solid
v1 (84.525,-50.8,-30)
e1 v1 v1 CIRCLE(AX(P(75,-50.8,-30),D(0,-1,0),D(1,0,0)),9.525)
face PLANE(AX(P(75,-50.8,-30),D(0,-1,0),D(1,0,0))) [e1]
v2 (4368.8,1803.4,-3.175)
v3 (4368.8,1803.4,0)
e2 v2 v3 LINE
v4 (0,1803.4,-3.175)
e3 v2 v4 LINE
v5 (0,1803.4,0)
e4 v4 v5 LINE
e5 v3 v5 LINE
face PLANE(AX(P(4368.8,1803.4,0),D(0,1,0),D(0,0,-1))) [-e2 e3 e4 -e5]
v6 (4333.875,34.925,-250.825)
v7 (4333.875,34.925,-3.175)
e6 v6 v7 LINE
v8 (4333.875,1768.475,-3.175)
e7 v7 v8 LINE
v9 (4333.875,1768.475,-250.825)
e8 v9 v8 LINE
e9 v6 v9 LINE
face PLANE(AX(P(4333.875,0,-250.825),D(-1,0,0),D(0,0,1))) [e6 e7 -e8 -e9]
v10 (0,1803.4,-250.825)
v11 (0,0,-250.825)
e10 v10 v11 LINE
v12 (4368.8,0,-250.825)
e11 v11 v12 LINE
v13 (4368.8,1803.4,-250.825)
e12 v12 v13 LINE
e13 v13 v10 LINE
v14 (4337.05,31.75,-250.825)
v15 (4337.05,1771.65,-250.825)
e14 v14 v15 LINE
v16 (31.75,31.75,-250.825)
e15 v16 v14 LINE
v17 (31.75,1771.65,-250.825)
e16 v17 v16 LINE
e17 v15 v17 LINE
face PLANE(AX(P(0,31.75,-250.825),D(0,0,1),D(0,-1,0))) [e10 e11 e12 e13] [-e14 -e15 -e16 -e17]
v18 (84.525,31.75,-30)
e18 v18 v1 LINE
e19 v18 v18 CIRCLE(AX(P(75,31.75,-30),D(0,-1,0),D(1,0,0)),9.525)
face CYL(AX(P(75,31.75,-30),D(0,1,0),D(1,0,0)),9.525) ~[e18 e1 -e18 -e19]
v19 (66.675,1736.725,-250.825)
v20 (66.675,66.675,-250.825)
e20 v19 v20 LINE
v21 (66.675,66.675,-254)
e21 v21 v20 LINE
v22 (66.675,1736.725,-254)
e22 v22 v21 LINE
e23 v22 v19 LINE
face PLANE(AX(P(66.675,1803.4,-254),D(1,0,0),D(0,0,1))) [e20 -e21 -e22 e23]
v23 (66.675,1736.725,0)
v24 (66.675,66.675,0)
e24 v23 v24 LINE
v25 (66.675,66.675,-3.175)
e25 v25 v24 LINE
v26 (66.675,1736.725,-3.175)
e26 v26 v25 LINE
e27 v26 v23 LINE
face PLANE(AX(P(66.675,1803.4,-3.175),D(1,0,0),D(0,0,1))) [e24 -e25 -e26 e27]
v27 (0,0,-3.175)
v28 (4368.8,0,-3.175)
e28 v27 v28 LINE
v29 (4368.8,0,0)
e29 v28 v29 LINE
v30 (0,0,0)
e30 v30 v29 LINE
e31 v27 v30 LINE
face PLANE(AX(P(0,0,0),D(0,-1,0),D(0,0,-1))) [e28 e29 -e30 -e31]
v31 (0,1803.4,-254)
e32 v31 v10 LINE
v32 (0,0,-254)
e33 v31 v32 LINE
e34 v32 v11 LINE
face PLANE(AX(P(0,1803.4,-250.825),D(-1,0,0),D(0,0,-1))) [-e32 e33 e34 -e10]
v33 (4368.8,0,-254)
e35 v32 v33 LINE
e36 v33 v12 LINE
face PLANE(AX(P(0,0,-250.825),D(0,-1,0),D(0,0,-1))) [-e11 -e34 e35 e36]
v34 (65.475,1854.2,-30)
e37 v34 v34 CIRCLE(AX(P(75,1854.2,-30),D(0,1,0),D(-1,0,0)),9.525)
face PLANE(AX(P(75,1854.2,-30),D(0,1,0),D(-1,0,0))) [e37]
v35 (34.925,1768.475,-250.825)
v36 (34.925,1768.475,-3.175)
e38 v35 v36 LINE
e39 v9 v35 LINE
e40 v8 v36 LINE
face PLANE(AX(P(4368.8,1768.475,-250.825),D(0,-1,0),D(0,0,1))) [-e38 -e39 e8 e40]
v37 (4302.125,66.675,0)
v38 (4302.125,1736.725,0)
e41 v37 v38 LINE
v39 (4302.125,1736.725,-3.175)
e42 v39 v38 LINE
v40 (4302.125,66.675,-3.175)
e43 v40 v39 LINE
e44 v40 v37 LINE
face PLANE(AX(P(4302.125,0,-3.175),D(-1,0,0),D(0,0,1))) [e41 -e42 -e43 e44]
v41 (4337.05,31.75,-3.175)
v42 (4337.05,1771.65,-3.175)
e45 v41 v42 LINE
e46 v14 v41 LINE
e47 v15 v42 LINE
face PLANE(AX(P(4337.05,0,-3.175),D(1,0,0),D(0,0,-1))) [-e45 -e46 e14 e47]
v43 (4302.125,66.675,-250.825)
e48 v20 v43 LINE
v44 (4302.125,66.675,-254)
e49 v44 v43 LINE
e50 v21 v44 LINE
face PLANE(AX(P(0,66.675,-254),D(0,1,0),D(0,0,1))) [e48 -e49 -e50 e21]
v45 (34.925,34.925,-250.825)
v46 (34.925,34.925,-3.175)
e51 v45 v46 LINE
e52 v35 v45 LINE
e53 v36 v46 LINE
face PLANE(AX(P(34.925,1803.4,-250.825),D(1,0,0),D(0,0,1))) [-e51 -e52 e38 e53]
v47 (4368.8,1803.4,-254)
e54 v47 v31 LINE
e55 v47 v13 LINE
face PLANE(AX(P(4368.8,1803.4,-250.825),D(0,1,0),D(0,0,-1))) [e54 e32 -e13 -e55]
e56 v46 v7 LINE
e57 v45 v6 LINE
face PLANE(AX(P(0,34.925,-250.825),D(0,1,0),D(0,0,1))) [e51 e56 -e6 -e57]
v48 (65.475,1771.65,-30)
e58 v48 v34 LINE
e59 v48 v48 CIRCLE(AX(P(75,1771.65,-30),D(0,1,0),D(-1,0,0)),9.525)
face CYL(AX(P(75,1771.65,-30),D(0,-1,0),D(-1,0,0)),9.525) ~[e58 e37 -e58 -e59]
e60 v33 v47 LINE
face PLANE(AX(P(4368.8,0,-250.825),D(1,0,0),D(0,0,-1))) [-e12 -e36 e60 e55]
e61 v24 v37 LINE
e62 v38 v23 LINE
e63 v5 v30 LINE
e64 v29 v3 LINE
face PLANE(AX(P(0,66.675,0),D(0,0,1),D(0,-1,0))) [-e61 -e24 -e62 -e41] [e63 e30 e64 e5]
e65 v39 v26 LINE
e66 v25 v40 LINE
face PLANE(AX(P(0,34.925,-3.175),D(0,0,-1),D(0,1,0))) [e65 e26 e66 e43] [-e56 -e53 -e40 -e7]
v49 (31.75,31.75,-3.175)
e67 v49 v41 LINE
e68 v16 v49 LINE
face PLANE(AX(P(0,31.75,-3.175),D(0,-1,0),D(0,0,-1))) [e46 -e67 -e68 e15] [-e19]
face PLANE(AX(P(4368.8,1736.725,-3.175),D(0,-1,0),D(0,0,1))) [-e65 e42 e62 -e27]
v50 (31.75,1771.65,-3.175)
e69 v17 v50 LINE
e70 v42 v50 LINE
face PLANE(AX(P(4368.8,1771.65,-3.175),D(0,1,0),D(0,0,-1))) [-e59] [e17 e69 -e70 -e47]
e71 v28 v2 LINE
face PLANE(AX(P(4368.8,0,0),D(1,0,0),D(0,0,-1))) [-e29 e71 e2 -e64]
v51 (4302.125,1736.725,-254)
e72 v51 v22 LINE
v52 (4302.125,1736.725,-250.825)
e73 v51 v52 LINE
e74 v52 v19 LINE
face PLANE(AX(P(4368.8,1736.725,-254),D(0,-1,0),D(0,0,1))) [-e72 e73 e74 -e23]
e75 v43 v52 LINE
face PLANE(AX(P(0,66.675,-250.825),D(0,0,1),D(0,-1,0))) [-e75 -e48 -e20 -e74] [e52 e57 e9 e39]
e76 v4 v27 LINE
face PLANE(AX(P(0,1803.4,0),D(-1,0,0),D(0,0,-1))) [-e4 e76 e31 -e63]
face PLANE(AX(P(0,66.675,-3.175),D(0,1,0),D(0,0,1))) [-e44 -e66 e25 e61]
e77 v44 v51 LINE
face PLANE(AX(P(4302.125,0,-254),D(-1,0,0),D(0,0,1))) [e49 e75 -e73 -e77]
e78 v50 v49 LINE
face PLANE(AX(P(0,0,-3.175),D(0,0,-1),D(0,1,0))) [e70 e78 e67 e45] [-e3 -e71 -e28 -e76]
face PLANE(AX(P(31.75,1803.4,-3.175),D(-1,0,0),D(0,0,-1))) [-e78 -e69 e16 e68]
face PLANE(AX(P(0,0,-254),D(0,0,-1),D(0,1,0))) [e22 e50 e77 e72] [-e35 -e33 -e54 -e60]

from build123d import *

# Parameters (mm, degrees)
F3_R     = 9.525
F4_DEPTH = 82.55
F5_R     = 9.525
F6_DEPTH = 82.55


with BuildPart() as f2:
    # F2: sweep along a path in F0
    with BuildLine(Plane.XY) as f2_path:
        Line((0, 0), (4368.8, 0))
        Line((4368.8, 0), (4368.8, 1803.4))
        Line((4368.8, 1803.4), (0, 1803.4))
        Line((0, 1803.4), (0, 0))
    # F1 (on Right) → F2 (sweep)
    with BuildSketch(Plane.YZ):
        Polygon((66.675, 0), (0, 0), (0, -3.175), (31.75, -3.175), (31.75, -250.825), (0, -250.825), (0, -254), (66.675, -254), (66.675, -250.825), (34.925, -250.825), (34.925, -3.175), (66.675, -3.175), align=None)
    sweep(path=f2_path.line, transition=Transition.RIGHT)

    # F3 (on face) → F4 (join)
    with BuildSketch(Plane.XZ.offset(-31.75)):
        with Locations((75, -30)):
            Circle(F3_R)
    extrude(amount=F4_DEPTH)

    # F5 (on face) → F6 (join)
    with BuildSketch(Plane(origin=(0, 1771.65, 0), x_dir=(-1, 0, 0), z_dir=(0, 1, 0))):
        with Locations((-75, -30)):
            Circle(F5_R)
    extrude(amount=F6_DEPTH)


solid = f2.part
